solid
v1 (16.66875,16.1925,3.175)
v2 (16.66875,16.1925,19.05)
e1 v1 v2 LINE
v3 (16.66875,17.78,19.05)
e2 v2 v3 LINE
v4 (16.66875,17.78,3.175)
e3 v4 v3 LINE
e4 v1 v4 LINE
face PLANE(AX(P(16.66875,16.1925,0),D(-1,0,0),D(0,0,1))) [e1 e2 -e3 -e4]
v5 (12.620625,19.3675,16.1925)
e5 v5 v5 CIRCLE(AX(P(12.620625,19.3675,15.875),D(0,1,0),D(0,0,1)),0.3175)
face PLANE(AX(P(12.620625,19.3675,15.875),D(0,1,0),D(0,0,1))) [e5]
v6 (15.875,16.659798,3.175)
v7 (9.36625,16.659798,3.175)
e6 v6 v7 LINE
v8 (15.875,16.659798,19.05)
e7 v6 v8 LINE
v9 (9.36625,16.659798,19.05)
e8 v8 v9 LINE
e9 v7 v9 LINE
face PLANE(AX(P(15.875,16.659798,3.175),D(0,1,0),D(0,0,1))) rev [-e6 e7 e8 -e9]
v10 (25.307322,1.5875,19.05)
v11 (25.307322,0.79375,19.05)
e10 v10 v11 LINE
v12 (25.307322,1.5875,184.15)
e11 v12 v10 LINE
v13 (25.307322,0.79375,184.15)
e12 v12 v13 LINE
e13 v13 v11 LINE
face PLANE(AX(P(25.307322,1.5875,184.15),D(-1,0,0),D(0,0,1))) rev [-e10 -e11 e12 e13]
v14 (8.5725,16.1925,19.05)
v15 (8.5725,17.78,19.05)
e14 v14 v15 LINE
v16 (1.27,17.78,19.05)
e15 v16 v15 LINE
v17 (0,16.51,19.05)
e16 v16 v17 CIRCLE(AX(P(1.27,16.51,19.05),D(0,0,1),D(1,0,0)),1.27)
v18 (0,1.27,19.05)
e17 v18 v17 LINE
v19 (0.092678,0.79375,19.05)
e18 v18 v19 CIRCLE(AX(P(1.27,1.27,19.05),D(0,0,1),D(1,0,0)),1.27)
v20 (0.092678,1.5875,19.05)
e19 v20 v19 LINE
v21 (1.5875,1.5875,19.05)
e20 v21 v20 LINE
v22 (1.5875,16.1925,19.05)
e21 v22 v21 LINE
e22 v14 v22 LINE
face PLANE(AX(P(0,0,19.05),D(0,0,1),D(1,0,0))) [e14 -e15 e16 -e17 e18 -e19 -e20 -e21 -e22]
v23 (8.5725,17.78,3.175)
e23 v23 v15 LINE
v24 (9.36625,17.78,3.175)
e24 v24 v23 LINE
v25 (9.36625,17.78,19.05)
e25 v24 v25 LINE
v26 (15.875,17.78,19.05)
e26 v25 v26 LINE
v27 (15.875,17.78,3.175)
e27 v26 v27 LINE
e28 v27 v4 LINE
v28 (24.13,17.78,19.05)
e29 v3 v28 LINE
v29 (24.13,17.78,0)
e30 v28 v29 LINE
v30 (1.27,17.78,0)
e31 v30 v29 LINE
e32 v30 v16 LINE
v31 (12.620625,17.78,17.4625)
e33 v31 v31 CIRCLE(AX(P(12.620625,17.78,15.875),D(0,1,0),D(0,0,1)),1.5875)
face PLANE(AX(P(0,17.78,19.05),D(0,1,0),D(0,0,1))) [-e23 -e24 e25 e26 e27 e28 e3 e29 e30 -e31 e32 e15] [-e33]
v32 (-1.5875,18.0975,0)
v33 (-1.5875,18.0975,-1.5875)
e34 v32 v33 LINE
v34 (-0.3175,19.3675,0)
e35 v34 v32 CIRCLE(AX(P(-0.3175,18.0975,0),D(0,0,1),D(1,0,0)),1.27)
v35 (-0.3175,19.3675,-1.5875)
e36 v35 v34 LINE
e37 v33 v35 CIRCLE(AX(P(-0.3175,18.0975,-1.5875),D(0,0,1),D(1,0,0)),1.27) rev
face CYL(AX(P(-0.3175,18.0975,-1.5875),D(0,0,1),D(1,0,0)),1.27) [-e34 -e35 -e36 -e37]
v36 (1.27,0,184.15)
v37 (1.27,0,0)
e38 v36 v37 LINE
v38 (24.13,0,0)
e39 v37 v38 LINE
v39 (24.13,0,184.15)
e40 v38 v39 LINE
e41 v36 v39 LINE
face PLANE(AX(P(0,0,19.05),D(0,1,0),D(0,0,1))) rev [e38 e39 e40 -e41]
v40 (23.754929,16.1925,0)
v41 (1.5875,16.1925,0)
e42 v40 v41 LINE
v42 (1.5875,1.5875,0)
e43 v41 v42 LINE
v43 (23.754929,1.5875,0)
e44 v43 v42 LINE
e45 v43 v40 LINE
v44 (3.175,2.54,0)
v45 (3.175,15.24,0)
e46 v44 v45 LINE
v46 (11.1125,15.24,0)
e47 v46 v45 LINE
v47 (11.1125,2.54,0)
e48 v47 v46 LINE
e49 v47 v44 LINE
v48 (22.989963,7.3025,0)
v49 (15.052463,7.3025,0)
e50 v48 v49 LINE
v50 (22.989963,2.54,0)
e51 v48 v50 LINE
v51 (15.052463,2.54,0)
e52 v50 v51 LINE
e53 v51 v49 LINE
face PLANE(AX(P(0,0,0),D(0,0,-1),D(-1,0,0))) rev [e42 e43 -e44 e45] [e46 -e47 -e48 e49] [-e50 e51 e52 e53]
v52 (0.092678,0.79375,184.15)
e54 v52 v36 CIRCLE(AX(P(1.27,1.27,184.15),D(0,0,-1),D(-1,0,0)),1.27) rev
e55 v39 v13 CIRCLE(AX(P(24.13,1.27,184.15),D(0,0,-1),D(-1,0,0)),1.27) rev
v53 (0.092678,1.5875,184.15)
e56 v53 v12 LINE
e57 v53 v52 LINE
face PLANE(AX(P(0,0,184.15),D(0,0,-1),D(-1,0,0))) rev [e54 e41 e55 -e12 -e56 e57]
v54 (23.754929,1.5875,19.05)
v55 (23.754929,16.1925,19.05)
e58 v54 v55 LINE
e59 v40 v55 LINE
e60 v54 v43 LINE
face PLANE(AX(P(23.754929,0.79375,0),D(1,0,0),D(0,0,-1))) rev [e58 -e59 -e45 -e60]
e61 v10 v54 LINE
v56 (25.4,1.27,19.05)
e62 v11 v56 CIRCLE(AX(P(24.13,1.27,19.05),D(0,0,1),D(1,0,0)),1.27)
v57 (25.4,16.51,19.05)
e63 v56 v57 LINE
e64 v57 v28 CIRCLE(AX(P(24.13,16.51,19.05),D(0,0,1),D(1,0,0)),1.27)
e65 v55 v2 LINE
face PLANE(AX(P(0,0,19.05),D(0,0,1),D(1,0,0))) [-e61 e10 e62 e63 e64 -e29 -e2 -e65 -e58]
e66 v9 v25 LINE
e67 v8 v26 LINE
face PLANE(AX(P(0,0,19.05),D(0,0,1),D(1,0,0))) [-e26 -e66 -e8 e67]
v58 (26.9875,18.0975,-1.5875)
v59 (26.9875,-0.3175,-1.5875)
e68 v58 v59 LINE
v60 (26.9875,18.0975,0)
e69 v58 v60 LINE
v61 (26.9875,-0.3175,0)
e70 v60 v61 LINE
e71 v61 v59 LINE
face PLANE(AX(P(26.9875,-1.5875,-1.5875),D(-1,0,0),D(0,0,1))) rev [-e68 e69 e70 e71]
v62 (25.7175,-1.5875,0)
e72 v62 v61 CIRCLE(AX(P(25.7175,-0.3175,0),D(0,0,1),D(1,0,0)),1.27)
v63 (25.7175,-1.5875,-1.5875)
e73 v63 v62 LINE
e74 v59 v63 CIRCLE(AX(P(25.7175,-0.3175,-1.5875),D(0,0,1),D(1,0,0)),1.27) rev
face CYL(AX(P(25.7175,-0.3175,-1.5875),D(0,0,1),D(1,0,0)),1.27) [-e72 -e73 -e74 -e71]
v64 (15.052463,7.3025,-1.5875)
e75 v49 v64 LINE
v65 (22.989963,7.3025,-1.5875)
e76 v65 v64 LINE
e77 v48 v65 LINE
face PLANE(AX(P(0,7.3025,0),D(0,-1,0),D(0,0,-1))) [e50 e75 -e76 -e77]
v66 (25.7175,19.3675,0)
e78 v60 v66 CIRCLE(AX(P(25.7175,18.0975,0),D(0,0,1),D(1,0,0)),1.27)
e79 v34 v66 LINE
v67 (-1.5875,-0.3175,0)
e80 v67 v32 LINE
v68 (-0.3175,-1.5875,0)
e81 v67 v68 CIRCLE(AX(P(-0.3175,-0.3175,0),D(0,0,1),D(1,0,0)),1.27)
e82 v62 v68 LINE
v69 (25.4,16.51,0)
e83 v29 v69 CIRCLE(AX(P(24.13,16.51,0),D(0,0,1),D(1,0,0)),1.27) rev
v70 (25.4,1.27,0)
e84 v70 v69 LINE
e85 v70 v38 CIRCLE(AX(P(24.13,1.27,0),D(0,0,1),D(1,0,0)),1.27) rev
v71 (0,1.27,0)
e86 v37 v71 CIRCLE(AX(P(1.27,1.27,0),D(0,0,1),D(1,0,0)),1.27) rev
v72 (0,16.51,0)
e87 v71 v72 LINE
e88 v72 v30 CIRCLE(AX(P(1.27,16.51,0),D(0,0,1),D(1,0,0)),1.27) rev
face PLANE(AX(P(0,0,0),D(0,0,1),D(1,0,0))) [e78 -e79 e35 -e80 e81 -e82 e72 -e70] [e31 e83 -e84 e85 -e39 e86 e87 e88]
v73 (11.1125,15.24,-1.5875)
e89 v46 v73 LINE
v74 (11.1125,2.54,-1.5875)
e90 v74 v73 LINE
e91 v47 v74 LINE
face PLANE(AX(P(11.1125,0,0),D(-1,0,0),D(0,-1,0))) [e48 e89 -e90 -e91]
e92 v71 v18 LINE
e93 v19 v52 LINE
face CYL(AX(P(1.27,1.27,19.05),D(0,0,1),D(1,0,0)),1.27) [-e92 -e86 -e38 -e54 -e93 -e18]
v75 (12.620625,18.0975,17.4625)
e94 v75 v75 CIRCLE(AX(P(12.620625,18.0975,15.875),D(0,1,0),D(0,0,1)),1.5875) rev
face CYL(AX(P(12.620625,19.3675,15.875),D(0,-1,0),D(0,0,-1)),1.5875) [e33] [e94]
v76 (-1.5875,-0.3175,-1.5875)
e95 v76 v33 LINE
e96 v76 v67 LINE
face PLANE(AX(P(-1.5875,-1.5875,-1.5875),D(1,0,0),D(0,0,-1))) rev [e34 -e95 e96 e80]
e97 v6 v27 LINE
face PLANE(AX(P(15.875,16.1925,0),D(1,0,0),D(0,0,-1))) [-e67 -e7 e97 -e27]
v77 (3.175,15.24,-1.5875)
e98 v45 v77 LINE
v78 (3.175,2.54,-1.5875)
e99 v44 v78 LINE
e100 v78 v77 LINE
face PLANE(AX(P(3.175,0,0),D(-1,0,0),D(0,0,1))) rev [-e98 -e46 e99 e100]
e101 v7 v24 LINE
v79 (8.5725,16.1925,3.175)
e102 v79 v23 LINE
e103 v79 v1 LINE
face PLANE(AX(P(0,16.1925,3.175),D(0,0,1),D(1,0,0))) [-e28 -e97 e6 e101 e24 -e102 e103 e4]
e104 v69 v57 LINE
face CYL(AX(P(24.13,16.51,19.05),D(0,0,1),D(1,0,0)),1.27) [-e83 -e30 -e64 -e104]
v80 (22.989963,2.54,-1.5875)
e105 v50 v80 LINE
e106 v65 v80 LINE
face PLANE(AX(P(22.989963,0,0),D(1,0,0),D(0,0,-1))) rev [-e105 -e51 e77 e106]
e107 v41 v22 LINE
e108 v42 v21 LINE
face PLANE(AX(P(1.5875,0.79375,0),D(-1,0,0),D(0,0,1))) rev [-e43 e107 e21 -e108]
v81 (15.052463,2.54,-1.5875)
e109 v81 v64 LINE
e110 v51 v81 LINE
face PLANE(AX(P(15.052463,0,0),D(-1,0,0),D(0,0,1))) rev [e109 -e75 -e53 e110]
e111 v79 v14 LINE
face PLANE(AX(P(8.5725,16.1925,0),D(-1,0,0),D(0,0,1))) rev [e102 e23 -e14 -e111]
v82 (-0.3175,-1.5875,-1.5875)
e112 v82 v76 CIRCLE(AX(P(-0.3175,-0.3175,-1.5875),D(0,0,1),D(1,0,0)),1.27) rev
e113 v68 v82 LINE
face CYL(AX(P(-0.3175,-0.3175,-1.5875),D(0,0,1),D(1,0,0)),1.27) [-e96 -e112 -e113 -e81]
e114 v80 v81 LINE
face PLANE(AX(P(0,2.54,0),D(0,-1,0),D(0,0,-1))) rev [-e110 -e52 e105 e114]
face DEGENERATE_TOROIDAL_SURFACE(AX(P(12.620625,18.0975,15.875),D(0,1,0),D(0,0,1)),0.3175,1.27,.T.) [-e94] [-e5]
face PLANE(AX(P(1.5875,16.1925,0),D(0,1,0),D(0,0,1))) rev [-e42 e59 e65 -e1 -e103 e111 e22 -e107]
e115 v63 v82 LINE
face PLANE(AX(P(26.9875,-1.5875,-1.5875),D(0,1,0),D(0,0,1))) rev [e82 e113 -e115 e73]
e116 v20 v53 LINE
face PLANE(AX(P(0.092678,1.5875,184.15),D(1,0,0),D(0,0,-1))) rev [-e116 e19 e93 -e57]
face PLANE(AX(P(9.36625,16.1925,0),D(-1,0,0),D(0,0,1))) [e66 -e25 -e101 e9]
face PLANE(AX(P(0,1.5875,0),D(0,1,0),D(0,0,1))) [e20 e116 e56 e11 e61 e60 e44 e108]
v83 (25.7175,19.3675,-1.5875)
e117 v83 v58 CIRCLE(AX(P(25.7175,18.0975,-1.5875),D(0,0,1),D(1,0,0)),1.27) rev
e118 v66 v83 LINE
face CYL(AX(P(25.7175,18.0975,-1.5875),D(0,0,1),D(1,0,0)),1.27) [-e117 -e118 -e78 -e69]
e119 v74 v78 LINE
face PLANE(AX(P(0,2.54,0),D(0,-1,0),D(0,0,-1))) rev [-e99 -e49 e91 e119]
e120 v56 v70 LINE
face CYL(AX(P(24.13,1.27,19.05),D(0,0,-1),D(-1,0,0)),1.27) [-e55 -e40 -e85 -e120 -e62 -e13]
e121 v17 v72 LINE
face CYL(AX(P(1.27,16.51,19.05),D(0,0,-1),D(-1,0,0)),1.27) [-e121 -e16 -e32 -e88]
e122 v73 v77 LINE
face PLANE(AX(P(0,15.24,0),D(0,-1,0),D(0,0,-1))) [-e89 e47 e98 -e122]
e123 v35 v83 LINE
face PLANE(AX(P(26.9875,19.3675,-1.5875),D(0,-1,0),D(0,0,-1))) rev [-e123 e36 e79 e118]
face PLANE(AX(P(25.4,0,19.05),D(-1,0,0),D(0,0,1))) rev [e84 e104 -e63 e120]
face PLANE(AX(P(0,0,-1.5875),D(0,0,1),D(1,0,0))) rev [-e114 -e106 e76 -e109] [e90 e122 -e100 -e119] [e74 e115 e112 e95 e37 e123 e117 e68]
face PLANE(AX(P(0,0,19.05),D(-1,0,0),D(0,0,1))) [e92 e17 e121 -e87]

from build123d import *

# Parameters (mm, degrees)
SKETCH1_W           = 25.4
SKETCH1_H           = 17.78
BOSS_EXTRUDE1_DEPTH = 19.05
SKETCH2_W           = 25.4
SKETCH2_H           = 0.79375
BOSS_EXTRUDE2_DEPTH = 165.1
SKETCH3_W           = 28.575
SKETCH3_H           = 20.955
BOSS_EXTRUDE3_DEPTH = 1.5875
SKETCH4_W           = 22.167429019
SKETCH4_H           = 15.39875
CUT_EXTRUDE1_DEPTH  = 19.05
CUT_EXTRUDE2_DEPTH  = 1.5875
SKETCH8_W           = 7.9375
SKETCH8_H           = 4.7625
CUT_EXTRUDE3_DEPTH  = 1.5875
FILLET9_R           = 1.27
FILLET10_R          = 1.27
FILLET11_R          = 1.27
FILLET12_R          = 1.27
FILLET13_R          = 1.27
FILLET14_R          = 1.27
FILLET15_R          = 1.27
FILLET16_R          = 1.27
SKETCH9_W           = 0.79375
SKETCH9_H           = 15.875
CUT_EXTRUDE5_DEPTH  = 1.5875
SKETCH11_W          = 0.79375
SKETCH11_H          = 15.875
CUT_EXTRUDE6_DEPTH  = 1.5875
SKETCH12_W          = 6.50875
SKETCH12_H          = 0.467297544
CUT_EXTRUDE7_DEPTH  = 15.875
SKETCH13_R          = 1.5875
BOSS_EXTRUDE5_DEPTH = 1.5875
FILLET22_R          = 1.27
SKETCH17_W          = 22.167429019
SKETCH17_H          = 19.05
BOSS_EXTRUDE6_DEPTH = 0.79375
SKETCH18_W          = 25.21464302
SKETCH18_H          = 165.1
BOSS_EXTRUDE7_DEPTH = 0.79375


with BuildPart() as part:
    # Sketch1 → Boss-Extrude1 (new body)
    with BuildSketch(Plane.XY):
        with Locations((12.7, 8.89)):
            Rectangle(SKETCH1_W, SKETCH1_H)
    extrude(amount=BOSS_EXTRUDE1_DEPTH)

    # Sketch2 → Boss-Extrude2 (add)
    with BuildSketch(Plane.XY.offset(19.05)):
        with Locations((12.7, 0.396875)):
            Rectangle(SKETCH2_W, SKETCH2_H)
    extrude(amount=BOSS_EXTRUDE2_DEPTH)

    # Sketch3 → Boss-Extrude3 (add)
    with BuildSketch(Plane(origin=(0, 0, 0), x_dir=(-1, 0, 0), z_dir=(0, 0, -1))):
        with Locations((-12.7, 8.89)):
            Rectangle(SKETCH3_W, SKETCH3_H)
    extrude(amount=BOSS_EXTRUDE3_DEPTH)

    # Sketch4 → Cut-Extrude1 (cut)
    with BuildSketch(Plane.XY.offset(19.05)):
        with Locations((12.67121451, 8.493125)):
            Rectangle(SKETCH4_W, SKETCH4_H)
    extrude(amount=-CUT_EXTRUDE1_DEPTH, mode=Mode.SUBTRACT)

    # Sketch5 → Cut-Extrude2 (cut)
    with BuildSketch(Plane(origin=(0, 0, -1.5875), x_dir=(-1, 0, 0), z_dir=(0, 0, -1))):
        Polygon((-11.1125, 15.24), (-11.1125, 8.89), (-11.1125, 2.54), (-3.175, 2.54), (-3.175, 15.24), align=None)
    extrude(amount=-CUT_EXTRUDE2_DEPTH, mode=Mode.SUBTRACT)

    # Sketch8 → Cut-Extrude3 (cut)
    with BuildSketch(Plane(origin=(0, 0, -1.5875), x_dir=(-1, 0, 0), z_dir=(0, 0, -1))):
        with Locations((-19.021212582, 4.92125)):
            Rectangle(SKETCH8_W, SKETCH8_H)
    extrude(amount=-CUT_EXTRUDE3_DEPTH, mode=Mode.SUBTRACT)

    # Fillet9
    fillet9_edges = [part.edges().sort_by_distance(p)[0] for p in [
        (25.4, 17.78, 9.525),
    ]]
    fillet(fillet9_edges, radius=FILLET9_R)

    # Fillet10
    fillet10_edges = [part.edges().sort_by_distance(p)[0] for p in [
        (0, 17.78, 9.525),
    ]]
    fillet(fillet10_edges, radius=FILLET10_R)

    # Fillet11
    # the kernel refuses this fillet: 1.27 mm, written as the material it takes off along each edge
    with BuildSketch(Plane(origin=(25.4, 0, 0), x_dir=(0, 1, 0), z_dir=(0, 0, 1))) as fillet11_piece_1:
        with BuildLine():
            CenterArc((FILLET11_R, FILLET11_R), FILLET11_R, 180, 90)
            Line((0, FILLET11_R), (0, 0))
            Line((0, 0), (FILLET11_R, 0))
        make_face()
    extrude(amount=187.325, mode=Mode.SUBTRACT)

    # Fillet12
    # the kernel refuses this fillet: 1.27 mm, written as the material it takes off along each edge
    with BuildSketch(Plane(origin=(0, 0, 187.325), x_dir=(0, 1, 0), z_dir=(0, 0, -1))) as fillet12_piece_1:
        with BuildLine():
            CenterArc((FILLET12_R, FILLET12_R), FILLET12_R, 180, 90)
            Line((0, FILLET12_R), (0, 0))
            Line((0, 0), (FILLET12_R, 0))
        make_face()
    extrude(amount=187.325, mode=Mode.SUBTRACT)

    # Fillet13
    fillet13_edges = [part.edges().sort_by_distance(p)[0] for p in [
        (-1.5875, -1.5875, -0.79375),
    ]]
    fillet(fillet13_edges, radius=FILLET13_R)

    # Fillet14
    fillet14_edges = [part.edges().sort_by_distance(p)[0] for p in [
        (-1.5875, 19.3675, -0.79375),
    ]]
    fillet(fillet14_edges, radius=FILLET14_R)

    # Fillet15
    fillet15_edges = [part.edges().sort_by_distance(p)[0] for p in [
        (26.9875, -1.5875, -0.79375),
    ]]
    fillet(fillet15_edges, radius=FILLET15_R)

    # Fillet16
    fillet16_edges = [part.edges().sort_by_distance(p)[0] for p in [
        (26.9875, 19.3675, -0.79375),
    ]]
    fillet(fillet16_edges, radius=FILLET16_R)

    # Sketch9 → Cut-Extrude5 (cut)
    with BuildSketch(Plane(origin=(0, 17.78, 0), x_dir=(1, 0, 0), z_dir=(0, 1, 0))):
        with Locations((16.271875, -11.1125)):
            Rectangle(SKETCH9_W, SKETCH9_H)
    extrude(amount=-CUT_EXTRUDE5_DEPTH, mode=Mode.SUBTRACT)

    # Sketch11 → Cut-Extrude6 (cut)
    with BuildSketch(Plane(origin=(0, 17.78, 0), x_dir=(1, 0, 0), z_dir=(0, 1, 0))):
        with Locations((8.969375, -11.1125)):
            Rectangle(SKETCH11_W, SKETCH11_H)
    extrude(amount=-CUT_EXTRUDE6_DEPTH, mode=Mode.SUBTRACT)

    # Sketch12 → Cut-Extrude7 (cut)
    with BuildSketch(Plane.XY.offset(19.05)):
        with Locations((12.620625, 16.426148772)):
            Rectangle(SKETCH12_W, SKETCH12_H)
    extrude(amount=-CUT_EXTRUDE7_DEPTH, mode=Mode.SUBTRACT)

    # Sketch13 → Boss-Extrude5 (add)
    with BuildSketch(Plane(origin=(0, 17.78, 0), x_dir=(1, 0, 0), z_dir=(0, 1, 0))):
        with Locations(Location((12.620625, -15.875, 0), (0, 0, 270))):
            Circle(SKETCH13_R)
    extrude(amount=BOSS_EXTRUDE5_DEPTH)

    # Fillet22
    fillet22_edges = [part.edges().sort_by_distance(p)[0] for p in [
        (12.620625, 19.3675, 14.2875),
    ]]
    fillet(fillet22_edges, radius=FILLET22_R)

    # Sketch17 → Boss-Extrude6 (add)
    with BuildSketch(Plane(origin=(0, 0.79375, 0), x_dir=(1, 0, 0), z_dir=(0, 1, 0))):
        with Locations((12.67121451, -9.525)):
            Rectangle(SKETCH17_W, SKETCH17_H)
    extrude(amount=BOSS_EXTRUDE6_DEPTH)

    # Sketch18 → Boss-Extrude7 (add)
    with BuildSketch(Plane(origin=(0, 0.79375, 0), x_dir=(1, 0, 0), z_dir=(0, 1, 0))):
        with Locations((12.7, -101.6)):
            Rectangle(SKETCH18_W, SKETCH18_H)
    extrude(amount=BOSS_EXTRUDE7_DEPTH)


solid = part.part
